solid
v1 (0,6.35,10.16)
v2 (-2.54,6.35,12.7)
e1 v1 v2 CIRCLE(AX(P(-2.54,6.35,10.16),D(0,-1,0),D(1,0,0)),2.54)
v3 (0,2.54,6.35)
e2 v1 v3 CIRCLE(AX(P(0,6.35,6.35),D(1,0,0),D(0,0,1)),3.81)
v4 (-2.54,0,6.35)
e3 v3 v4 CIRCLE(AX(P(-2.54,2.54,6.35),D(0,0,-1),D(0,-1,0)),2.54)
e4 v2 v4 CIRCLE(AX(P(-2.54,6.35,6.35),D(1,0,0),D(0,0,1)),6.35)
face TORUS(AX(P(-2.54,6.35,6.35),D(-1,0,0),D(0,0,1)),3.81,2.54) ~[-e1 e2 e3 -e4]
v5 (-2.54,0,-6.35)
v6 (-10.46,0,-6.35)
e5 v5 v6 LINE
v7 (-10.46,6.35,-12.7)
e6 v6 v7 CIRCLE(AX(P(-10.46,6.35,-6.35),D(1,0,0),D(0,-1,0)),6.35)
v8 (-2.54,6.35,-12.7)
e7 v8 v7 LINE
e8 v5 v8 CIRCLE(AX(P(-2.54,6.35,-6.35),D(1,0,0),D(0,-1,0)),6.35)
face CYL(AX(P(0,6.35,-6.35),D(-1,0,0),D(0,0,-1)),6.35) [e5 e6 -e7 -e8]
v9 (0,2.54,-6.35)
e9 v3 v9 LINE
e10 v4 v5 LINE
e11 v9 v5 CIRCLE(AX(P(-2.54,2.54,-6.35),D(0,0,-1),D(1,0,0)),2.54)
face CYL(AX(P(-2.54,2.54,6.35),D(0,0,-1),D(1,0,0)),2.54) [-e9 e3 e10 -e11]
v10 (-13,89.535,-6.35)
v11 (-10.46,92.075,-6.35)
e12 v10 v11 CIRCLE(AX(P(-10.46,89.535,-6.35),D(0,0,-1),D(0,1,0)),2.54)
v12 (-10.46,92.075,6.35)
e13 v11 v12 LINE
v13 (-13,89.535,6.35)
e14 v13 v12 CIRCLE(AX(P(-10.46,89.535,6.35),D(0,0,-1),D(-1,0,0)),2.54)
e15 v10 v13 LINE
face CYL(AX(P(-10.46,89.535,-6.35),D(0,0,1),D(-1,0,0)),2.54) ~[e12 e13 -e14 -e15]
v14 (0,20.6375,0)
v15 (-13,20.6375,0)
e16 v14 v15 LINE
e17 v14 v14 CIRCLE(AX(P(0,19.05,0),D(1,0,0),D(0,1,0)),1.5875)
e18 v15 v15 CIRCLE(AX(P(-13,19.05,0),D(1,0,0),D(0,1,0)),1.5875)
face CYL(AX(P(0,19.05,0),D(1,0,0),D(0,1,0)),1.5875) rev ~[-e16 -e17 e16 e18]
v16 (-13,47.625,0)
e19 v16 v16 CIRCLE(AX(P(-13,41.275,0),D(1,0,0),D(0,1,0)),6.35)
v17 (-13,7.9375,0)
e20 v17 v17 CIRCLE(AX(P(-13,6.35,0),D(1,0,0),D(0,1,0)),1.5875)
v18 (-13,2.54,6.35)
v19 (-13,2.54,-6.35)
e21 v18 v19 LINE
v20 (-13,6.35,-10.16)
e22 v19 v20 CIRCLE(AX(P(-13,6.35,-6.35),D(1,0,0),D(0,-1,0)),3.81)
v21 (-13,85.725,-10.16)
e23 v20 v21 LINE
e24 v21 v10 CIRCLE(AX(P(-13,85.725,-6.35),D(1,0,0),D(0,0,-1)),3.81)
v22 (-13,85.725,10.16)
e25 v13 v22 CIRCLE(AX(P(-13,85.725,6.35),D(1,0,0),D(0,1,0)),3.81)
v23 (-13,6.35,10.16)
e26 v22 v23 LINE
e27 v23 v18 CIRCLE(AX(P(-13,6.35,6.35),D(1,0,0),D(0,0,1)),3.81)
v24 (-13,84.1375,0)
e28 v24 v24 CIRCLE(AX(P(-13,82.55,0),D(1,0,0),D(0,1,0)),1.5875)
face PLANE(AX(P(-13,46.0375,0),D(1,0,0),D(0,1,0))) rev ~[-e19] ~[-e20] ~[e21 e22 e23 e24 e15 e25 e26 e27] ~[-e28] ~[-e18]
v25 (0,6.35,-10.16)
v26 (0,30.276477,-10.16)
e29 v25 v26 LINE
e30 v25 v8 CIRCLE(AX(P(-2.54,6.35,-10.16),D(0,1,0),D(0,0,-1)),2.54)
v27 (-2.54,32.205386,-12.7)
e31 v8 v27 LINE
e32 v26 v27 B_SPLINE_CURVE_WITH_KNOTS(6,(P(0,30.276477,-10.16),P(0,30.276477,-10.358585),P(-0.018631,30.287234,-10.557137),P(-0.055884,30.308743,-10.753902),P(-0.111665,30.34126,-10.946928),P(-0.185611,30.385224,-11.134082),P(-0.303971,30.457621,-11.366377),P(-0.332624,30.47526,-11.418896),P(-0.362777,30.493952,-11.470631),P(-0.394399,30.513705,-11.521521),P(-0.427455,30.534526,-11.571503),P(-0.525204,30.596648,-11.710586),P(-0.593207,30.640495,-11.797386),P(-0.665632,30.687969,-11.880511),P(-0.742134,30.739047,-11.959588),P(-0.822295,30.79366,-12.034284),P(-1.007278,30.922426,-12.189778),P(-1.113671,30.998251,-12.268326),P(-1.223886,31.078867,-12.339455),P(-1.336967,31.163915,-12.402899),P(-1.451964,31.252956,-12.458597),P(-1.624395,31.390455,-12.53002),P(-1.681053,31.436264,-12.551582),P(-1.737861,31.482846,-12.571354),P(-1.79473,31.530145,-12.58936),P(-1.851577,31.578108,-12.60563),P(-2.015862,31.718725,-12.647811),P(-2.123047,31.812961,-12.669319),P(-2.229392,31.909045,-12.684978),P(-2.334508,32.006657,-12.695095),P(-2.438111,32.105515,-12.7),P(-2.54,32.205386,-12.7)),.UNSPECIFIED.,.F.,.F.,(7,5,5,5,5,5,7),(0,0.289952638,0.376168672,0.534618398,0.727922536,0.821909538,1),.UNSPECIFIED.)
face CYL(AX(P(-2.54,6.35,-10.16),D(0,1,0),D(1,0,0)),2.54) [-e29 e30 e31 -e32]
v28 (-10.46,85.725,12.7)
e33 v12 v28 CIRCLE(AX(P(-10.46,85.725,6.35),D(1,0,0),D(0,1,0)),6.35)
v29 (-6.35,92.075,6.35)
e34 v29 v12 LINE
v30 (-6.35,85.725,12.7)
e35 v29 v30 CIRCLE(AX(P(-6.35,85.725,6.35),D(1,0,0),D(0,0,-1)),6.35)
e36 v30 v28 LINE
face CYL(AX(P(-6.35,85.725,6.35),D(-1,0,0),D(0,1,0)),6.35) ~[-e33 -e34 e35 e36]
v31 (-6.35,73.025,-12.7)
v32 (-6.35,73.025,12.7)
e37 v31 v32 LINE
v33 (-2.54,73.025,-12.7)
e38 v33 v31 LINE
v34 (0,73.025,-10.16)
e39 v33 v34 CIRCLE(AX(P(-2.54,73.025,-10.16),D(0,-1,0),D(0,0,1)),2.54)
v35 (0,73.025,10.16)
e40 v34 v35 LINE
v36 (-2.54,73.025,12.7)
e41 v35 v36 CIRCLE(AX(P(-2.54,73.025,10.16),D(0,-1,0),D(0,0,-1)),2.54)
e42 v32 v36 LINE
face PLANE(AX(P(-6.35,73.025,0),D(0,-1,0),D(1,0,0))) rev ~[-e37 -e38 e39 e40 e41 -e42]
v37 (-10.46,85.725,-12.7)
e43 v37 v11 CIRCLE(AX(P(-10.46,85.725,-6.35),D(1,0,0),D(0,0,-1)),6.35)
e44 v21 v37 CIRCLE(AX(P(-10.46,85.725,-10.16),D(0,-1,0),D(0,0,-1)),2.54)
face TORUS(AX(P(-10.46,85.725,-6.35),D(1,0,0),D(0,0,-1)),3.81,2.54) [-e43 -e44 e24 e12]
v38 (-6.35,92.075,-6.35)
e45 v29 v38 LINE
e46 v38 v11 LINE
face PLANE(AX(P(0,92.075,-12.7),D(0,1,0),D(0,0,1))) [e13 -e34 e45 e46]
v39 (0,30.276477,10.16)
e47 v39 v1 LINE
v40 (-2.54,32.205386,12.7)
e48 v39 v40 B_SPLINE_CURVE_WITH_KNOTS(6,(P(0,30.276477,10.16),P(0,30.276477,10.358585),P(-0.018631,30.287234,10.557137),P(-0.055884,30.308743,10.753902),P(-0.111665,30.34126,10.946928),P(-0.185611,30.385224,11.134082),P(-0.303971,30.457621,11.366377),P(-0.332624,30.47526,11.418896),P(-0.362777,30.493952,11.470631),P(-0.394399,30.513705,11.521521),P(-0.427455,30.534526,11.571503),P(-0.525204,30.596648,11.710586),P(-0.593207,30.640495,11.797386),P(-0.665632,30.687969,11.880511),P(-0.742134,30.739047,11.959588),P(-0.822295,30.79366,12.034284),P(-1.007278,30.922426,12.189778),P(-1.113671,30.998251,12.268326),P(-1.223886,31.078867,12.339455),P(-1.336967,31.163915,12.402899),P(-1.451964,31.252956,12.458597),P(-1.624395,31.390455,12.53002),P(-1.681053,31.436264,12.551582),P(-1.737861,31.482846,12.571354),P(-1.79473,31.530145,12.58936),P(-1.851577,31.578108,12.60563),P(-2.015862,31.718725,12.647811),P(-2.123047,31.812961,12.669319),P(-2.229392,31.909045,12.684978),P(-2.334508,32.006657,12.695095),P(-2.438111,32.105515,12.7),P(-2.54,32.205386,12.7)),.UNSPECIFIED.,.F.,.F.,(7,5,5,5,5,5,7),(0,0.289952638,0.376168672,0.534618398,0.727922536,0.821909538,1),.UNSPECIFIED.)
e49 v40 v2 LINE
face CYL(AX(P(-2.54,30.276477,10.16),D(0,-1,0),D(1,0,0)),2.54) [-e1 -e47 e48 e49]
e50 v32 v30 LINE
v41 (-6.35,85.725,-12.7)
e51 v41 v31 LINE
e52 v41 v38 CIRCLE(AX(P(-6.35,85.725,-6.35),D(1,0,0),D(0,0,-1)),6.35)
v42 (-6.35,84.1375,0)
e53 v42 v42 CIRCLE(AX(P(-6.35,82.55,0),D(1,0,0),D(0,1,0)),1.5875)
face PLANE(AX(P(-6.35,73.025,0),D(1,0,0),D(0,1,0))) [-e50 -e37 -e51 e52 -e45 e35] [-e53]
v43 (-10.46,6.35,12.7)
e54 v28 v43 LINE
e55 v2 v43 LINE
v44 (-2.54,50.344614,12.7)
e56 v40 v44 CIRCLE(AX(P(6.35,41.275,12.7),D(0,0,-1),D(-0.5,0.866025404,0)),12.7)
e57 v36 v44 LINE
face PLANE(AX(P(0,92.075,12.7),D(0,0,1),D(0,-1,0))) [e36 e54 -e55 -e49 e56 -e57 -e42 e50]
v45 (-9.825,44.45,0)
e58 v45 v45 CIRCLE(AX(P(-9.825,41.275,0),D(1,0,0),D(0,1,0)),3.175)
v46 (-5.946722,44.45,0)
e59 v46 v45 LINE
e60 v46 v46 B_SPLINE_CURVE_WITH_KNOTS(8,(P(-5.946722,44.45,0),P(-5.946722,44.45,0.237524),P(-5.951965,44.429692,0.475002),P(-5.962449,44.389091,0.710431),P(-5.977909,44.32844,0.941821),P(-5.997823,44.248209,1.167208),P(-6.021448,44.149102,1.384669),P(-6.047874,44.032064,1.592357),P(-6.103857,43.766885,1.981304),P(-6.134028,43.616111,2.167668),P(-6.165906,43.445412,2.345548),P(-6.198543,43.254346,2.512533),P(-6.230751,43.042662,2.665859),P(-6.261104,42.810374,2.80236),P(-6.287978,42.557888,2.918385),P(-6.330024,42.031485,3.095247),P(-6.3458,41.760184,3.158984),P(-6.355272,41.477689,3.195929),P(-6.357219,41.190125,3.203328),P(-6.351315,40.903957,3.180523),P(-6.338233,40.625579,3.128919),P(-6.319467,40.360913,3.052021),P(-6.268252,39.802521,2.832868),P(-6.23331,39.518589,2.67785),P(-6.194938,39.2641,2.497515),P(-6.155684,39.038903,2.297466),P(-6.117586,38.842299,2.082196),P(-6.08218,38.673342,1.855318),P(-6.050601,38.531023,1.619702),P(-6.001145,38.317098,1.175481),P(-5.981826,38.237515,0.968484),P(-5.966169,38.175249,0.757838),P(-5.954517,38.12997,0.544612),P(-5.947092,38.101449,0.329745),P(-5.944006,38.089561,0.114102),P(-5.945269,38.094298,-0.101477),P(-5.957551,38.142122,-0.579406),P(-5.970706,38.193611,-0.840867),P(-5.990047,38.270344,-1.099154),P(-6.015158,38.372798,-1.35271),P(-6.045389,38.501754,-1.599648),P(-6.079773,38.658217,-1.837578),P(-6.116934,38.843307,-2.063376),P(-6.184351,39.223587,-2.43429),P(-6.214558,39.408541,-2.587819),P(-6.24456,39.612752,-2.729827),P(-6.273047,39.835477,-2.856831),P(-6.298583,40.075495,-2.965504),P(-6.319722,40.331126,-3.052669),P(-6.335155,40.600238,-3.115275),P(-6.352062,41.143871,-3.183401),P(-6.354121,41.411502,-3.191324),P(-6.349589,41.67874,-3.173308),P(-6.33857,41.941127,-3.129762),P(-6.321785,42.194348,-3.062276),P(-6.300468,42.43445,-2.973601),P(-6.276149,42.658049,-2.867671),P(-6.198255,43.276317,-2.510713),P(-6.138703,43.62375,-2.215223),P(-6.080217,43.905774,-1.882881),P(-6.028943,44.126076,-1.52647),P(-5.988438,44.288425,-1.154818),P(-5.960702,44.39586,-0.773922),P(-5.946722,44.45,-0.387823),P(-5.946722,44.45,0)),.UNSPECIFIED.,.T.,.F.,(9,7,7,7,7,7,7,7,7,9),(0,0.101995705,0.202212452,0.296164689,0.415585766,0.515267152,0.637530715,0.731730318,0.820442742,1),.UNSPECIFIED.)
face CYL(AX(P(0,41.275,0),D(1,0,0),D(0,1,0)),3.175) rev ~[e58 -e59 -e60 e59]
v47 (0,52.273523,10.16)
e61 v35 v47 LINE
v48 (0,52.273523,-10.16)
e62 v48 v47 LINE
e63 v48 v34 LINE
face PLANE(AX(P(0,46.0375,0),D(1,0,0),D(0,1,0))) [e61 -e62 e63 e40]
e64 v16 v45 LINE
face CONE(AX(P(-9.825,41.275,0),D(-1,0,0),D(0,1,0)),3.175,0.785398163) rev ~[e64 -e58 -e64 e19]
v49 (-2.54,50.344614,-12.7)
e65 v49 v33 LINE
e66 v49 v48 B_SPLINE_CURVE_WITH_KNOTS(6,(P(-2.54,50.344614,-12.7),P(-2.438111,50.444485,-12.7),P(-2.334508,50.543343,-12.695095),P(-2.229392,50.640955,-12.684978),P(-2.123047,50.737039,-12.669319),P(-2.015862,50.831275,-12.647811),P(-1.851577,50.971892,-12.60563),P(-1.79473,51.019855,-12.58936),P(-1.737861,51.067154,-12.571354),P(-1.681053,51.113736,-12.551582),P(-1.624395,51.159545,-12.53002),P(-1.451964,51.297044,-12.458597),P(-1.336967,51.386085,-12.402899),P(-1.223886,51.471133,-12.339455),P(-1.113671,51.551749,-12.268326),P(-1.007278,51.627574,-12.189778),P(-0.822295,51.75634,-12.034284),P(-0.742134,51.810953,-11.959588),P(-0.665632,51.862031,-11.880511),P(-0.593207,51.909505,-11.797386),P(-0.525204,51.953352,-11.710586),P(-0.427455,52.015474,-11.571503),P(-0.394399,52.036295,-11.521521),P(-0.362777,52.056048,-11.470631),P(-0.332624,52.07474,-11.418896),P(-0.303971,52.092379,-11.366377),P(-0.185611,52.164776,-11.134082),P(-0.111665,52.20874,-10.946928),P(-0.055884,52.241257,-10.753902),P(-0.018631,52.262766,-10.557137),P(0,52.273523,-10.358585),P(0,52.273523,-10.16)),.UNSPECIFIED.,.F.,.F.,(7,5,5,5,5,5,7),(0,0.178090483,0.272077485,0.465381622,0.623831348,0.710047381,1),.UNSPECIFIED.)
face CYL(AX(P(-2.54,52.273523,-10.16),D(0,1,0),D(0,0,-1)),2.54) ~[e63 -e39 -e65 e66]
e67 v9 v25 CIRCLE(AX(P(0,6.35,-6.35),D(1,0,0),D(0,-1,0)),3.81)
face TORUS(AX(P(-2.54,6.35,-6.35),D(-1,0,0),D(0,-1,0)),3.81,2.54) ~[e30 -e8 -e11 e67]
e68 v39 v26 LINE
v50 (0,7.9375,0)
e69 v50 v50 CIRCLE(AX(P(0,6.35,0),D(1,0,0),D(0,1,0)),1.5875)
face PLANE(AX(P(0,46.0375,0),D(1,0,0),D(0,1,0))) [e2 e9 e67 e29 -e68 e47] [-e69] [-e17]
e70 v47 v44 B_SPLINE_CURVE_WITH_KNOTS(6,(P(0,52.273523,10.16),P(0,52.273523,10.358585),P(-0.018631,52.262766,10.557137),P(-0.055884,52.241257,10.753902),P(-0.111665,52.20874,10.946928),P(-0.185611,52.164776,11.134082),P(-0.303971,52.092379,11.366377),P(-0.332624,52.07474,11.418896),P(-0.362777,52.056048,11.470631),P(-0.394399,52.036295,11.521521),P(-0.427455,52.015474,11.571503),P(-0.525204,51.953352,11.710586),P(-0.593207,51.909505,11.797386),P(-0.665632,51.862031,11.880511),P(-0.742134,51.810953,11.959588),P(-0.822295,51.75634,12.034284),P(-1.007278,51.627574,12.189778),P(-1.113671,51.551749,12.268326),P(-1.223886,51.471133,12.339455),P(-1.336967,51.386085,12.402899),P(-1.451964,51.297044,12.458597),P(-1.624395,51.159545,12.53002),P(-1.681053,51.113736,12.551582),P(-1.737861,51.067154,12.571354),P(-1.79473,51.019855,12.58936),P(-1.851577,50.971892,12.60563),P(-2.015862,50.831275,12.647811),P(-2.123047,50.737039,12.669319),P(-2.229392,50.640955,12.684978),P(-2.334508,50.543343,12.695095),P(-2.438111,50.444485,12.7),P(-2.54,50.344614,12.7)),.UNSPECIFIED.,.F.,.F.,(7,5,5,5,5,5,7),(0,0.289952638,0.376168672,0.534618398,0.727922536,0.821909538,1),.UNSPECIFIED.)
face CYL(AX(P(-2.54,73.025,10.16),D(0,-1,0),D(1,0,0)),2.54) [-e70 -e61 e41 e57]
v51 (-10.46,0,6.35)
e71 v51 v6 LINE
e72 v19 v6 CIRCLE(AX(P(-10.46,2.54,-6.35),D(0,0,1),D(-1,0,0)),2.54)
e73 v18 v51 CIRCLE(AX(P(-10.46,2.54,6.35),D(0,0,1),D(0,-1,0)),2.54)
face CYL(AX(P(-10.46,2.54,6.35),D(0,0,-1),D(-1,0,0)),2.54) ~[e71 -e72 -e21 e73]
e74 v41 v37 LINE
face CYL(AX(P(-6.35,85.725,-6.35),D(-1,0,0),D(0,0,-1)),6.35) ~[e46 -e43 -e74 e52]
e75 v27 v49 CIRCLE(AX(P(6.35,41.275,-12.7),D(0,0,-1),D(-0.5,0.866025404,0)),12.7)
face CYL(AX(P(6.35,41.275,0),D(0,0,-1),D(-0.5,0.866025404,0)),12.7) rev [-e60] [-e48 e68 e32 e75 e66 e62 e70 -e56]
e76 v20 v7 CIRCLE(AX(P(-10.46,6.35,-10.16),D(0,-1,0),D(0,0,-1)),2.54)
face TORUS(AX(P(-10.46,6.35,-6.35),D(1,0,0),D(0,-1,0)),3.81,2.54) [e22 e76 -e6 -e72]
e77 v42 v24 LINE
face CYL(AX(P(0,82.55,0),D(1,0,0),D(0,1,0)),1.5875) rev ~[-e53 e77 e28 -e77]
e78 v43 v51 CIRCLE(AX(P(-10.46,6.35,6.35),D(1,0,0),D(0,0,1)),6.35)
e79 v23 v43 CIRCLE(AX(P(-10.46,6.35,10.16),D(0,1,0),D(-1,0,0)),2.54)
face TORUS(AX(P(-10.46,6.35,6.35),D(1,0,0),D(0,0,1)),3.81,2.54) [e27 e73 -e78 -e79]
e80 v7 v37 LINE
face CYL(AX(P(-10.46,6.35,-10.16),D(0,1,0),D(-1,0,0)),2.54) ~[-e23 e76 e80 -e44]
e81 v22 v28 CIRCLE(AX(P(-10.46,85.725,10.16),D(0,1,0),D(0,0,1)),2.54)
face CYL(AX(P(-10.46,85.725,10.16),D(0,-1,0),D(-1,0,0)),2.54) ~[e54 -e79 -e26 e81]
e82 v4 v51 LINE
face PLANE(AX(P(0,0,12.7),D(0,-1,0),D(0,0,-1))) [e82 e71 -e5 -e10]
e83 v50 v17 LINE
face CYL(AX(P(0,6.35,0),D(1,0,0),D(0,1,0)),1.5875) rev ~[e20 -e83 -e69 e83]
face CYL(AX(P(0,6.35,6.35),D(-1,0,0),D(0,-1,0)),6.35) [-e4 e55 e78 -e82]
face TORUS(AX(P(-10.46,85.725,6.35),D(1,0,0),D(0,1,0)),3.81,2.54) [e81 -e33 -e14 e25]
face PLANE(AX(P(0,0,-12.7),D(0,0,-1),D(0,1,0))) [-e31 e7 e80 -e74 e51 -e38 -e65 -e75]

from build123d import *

# Parameters (mm, degrees)
F0_R     = 1.5875
F0_R_2   = 3.175
F1_DEPTH = 13
F2_W     = 6.35
F2_H     = 19.05
F3_DEPTH = 37.5
F4_R     = 6.35
F5_R     = 2.54
F6_SIZE  = 3.175


# Not quite as in the source:
# - a feature names something its author has since deleted; it is built from what else it names


with BuildPart() as f1:
    # F0 (on Right) → F1 (new body)
    with BuildSketch(Plane.YZ):
        Polygon((0, 0), (0, -12.7), (92.075, -12.7), (92.075, 0), (92.075, 12.7), (0, 12.7), align=None)
        with Locations((6.35, 0)):
            Circle(F0_R, mode=Mode.SUBTRACT)
        with Locations((19.05, 0)):
            Circle(F0_R, mode=Mode.SUBTRACT)
        with Locations((41.275, 0)):
            Circle(F0_R_2, mode=Mode.SUBTRACT)
        with Locations((82.55, 0)):
            Circle(F0_R, mode=Mode.SUBTRACT)
    extrude(amount=-F1_DEPTH)

    # F2 (on Top) → F3 (cut, symmetric)
    with BuildSketch(Plane.XY):
        with BuildLine():
            Line((0, 30.2764773719), (0, 52.2735226281))
            ThreePointArc((0, 52.2735226281), (-6.35, 41.275), (0, 30.2764773719))
        make_face()
        with Locations((-3.175, 82.55)):
            Rectangle(F2_W, F2_H)
    extrude(amount=F3_DEPTH, both=True, mode=Mode.SUBTRACT)

    # F4
    f4_edges = [f1.edges().sort_by_distance(p)[0] for p in [
        (-6.5, 0, -12.7),
        (-6.5, 0, 12.7),
        (-9.675, 92.075, -12.7),
        (-9.675, 92.075, 12.7),
    ]]
    fillet(f4_edges, radius=F4_R)

    # F5
    f5_edges = [f1.edges().sort_by_distance(p)[0] for p in [
        (-13, 90.215128, -10.840128),
        (-13, 92.075, 0),
        (0, 0, 0),
        (0, 62.649261, 12.7),
        (0, 62.649261, -12.7),
        (-13, 0, 0),
        (0, 1.859872, -10.840128),
        (0, 1.859872, 10.840128),
        (0, 18.313239, -12.7),
        (0, 18.313239, 12.7),
        (-13, 1.859872, -10.840128),
        (-13, 1.859872, 10.840128),
        (-13, 46.0375, -12.7),
        (-13, 90.215128, 10.840128),
        (-13, 46.0375, 12.7),
    ]]
    fillet(f5_edges, radius=F5_R)

    # F6
    f6_edges = [f1.edges().sort_by_distance(p)[0] for p in [
        (-13, 38.1, 0),
    ]]
    chamfer(f6_edges, length=F6_SIZE)


solid = f1.part
